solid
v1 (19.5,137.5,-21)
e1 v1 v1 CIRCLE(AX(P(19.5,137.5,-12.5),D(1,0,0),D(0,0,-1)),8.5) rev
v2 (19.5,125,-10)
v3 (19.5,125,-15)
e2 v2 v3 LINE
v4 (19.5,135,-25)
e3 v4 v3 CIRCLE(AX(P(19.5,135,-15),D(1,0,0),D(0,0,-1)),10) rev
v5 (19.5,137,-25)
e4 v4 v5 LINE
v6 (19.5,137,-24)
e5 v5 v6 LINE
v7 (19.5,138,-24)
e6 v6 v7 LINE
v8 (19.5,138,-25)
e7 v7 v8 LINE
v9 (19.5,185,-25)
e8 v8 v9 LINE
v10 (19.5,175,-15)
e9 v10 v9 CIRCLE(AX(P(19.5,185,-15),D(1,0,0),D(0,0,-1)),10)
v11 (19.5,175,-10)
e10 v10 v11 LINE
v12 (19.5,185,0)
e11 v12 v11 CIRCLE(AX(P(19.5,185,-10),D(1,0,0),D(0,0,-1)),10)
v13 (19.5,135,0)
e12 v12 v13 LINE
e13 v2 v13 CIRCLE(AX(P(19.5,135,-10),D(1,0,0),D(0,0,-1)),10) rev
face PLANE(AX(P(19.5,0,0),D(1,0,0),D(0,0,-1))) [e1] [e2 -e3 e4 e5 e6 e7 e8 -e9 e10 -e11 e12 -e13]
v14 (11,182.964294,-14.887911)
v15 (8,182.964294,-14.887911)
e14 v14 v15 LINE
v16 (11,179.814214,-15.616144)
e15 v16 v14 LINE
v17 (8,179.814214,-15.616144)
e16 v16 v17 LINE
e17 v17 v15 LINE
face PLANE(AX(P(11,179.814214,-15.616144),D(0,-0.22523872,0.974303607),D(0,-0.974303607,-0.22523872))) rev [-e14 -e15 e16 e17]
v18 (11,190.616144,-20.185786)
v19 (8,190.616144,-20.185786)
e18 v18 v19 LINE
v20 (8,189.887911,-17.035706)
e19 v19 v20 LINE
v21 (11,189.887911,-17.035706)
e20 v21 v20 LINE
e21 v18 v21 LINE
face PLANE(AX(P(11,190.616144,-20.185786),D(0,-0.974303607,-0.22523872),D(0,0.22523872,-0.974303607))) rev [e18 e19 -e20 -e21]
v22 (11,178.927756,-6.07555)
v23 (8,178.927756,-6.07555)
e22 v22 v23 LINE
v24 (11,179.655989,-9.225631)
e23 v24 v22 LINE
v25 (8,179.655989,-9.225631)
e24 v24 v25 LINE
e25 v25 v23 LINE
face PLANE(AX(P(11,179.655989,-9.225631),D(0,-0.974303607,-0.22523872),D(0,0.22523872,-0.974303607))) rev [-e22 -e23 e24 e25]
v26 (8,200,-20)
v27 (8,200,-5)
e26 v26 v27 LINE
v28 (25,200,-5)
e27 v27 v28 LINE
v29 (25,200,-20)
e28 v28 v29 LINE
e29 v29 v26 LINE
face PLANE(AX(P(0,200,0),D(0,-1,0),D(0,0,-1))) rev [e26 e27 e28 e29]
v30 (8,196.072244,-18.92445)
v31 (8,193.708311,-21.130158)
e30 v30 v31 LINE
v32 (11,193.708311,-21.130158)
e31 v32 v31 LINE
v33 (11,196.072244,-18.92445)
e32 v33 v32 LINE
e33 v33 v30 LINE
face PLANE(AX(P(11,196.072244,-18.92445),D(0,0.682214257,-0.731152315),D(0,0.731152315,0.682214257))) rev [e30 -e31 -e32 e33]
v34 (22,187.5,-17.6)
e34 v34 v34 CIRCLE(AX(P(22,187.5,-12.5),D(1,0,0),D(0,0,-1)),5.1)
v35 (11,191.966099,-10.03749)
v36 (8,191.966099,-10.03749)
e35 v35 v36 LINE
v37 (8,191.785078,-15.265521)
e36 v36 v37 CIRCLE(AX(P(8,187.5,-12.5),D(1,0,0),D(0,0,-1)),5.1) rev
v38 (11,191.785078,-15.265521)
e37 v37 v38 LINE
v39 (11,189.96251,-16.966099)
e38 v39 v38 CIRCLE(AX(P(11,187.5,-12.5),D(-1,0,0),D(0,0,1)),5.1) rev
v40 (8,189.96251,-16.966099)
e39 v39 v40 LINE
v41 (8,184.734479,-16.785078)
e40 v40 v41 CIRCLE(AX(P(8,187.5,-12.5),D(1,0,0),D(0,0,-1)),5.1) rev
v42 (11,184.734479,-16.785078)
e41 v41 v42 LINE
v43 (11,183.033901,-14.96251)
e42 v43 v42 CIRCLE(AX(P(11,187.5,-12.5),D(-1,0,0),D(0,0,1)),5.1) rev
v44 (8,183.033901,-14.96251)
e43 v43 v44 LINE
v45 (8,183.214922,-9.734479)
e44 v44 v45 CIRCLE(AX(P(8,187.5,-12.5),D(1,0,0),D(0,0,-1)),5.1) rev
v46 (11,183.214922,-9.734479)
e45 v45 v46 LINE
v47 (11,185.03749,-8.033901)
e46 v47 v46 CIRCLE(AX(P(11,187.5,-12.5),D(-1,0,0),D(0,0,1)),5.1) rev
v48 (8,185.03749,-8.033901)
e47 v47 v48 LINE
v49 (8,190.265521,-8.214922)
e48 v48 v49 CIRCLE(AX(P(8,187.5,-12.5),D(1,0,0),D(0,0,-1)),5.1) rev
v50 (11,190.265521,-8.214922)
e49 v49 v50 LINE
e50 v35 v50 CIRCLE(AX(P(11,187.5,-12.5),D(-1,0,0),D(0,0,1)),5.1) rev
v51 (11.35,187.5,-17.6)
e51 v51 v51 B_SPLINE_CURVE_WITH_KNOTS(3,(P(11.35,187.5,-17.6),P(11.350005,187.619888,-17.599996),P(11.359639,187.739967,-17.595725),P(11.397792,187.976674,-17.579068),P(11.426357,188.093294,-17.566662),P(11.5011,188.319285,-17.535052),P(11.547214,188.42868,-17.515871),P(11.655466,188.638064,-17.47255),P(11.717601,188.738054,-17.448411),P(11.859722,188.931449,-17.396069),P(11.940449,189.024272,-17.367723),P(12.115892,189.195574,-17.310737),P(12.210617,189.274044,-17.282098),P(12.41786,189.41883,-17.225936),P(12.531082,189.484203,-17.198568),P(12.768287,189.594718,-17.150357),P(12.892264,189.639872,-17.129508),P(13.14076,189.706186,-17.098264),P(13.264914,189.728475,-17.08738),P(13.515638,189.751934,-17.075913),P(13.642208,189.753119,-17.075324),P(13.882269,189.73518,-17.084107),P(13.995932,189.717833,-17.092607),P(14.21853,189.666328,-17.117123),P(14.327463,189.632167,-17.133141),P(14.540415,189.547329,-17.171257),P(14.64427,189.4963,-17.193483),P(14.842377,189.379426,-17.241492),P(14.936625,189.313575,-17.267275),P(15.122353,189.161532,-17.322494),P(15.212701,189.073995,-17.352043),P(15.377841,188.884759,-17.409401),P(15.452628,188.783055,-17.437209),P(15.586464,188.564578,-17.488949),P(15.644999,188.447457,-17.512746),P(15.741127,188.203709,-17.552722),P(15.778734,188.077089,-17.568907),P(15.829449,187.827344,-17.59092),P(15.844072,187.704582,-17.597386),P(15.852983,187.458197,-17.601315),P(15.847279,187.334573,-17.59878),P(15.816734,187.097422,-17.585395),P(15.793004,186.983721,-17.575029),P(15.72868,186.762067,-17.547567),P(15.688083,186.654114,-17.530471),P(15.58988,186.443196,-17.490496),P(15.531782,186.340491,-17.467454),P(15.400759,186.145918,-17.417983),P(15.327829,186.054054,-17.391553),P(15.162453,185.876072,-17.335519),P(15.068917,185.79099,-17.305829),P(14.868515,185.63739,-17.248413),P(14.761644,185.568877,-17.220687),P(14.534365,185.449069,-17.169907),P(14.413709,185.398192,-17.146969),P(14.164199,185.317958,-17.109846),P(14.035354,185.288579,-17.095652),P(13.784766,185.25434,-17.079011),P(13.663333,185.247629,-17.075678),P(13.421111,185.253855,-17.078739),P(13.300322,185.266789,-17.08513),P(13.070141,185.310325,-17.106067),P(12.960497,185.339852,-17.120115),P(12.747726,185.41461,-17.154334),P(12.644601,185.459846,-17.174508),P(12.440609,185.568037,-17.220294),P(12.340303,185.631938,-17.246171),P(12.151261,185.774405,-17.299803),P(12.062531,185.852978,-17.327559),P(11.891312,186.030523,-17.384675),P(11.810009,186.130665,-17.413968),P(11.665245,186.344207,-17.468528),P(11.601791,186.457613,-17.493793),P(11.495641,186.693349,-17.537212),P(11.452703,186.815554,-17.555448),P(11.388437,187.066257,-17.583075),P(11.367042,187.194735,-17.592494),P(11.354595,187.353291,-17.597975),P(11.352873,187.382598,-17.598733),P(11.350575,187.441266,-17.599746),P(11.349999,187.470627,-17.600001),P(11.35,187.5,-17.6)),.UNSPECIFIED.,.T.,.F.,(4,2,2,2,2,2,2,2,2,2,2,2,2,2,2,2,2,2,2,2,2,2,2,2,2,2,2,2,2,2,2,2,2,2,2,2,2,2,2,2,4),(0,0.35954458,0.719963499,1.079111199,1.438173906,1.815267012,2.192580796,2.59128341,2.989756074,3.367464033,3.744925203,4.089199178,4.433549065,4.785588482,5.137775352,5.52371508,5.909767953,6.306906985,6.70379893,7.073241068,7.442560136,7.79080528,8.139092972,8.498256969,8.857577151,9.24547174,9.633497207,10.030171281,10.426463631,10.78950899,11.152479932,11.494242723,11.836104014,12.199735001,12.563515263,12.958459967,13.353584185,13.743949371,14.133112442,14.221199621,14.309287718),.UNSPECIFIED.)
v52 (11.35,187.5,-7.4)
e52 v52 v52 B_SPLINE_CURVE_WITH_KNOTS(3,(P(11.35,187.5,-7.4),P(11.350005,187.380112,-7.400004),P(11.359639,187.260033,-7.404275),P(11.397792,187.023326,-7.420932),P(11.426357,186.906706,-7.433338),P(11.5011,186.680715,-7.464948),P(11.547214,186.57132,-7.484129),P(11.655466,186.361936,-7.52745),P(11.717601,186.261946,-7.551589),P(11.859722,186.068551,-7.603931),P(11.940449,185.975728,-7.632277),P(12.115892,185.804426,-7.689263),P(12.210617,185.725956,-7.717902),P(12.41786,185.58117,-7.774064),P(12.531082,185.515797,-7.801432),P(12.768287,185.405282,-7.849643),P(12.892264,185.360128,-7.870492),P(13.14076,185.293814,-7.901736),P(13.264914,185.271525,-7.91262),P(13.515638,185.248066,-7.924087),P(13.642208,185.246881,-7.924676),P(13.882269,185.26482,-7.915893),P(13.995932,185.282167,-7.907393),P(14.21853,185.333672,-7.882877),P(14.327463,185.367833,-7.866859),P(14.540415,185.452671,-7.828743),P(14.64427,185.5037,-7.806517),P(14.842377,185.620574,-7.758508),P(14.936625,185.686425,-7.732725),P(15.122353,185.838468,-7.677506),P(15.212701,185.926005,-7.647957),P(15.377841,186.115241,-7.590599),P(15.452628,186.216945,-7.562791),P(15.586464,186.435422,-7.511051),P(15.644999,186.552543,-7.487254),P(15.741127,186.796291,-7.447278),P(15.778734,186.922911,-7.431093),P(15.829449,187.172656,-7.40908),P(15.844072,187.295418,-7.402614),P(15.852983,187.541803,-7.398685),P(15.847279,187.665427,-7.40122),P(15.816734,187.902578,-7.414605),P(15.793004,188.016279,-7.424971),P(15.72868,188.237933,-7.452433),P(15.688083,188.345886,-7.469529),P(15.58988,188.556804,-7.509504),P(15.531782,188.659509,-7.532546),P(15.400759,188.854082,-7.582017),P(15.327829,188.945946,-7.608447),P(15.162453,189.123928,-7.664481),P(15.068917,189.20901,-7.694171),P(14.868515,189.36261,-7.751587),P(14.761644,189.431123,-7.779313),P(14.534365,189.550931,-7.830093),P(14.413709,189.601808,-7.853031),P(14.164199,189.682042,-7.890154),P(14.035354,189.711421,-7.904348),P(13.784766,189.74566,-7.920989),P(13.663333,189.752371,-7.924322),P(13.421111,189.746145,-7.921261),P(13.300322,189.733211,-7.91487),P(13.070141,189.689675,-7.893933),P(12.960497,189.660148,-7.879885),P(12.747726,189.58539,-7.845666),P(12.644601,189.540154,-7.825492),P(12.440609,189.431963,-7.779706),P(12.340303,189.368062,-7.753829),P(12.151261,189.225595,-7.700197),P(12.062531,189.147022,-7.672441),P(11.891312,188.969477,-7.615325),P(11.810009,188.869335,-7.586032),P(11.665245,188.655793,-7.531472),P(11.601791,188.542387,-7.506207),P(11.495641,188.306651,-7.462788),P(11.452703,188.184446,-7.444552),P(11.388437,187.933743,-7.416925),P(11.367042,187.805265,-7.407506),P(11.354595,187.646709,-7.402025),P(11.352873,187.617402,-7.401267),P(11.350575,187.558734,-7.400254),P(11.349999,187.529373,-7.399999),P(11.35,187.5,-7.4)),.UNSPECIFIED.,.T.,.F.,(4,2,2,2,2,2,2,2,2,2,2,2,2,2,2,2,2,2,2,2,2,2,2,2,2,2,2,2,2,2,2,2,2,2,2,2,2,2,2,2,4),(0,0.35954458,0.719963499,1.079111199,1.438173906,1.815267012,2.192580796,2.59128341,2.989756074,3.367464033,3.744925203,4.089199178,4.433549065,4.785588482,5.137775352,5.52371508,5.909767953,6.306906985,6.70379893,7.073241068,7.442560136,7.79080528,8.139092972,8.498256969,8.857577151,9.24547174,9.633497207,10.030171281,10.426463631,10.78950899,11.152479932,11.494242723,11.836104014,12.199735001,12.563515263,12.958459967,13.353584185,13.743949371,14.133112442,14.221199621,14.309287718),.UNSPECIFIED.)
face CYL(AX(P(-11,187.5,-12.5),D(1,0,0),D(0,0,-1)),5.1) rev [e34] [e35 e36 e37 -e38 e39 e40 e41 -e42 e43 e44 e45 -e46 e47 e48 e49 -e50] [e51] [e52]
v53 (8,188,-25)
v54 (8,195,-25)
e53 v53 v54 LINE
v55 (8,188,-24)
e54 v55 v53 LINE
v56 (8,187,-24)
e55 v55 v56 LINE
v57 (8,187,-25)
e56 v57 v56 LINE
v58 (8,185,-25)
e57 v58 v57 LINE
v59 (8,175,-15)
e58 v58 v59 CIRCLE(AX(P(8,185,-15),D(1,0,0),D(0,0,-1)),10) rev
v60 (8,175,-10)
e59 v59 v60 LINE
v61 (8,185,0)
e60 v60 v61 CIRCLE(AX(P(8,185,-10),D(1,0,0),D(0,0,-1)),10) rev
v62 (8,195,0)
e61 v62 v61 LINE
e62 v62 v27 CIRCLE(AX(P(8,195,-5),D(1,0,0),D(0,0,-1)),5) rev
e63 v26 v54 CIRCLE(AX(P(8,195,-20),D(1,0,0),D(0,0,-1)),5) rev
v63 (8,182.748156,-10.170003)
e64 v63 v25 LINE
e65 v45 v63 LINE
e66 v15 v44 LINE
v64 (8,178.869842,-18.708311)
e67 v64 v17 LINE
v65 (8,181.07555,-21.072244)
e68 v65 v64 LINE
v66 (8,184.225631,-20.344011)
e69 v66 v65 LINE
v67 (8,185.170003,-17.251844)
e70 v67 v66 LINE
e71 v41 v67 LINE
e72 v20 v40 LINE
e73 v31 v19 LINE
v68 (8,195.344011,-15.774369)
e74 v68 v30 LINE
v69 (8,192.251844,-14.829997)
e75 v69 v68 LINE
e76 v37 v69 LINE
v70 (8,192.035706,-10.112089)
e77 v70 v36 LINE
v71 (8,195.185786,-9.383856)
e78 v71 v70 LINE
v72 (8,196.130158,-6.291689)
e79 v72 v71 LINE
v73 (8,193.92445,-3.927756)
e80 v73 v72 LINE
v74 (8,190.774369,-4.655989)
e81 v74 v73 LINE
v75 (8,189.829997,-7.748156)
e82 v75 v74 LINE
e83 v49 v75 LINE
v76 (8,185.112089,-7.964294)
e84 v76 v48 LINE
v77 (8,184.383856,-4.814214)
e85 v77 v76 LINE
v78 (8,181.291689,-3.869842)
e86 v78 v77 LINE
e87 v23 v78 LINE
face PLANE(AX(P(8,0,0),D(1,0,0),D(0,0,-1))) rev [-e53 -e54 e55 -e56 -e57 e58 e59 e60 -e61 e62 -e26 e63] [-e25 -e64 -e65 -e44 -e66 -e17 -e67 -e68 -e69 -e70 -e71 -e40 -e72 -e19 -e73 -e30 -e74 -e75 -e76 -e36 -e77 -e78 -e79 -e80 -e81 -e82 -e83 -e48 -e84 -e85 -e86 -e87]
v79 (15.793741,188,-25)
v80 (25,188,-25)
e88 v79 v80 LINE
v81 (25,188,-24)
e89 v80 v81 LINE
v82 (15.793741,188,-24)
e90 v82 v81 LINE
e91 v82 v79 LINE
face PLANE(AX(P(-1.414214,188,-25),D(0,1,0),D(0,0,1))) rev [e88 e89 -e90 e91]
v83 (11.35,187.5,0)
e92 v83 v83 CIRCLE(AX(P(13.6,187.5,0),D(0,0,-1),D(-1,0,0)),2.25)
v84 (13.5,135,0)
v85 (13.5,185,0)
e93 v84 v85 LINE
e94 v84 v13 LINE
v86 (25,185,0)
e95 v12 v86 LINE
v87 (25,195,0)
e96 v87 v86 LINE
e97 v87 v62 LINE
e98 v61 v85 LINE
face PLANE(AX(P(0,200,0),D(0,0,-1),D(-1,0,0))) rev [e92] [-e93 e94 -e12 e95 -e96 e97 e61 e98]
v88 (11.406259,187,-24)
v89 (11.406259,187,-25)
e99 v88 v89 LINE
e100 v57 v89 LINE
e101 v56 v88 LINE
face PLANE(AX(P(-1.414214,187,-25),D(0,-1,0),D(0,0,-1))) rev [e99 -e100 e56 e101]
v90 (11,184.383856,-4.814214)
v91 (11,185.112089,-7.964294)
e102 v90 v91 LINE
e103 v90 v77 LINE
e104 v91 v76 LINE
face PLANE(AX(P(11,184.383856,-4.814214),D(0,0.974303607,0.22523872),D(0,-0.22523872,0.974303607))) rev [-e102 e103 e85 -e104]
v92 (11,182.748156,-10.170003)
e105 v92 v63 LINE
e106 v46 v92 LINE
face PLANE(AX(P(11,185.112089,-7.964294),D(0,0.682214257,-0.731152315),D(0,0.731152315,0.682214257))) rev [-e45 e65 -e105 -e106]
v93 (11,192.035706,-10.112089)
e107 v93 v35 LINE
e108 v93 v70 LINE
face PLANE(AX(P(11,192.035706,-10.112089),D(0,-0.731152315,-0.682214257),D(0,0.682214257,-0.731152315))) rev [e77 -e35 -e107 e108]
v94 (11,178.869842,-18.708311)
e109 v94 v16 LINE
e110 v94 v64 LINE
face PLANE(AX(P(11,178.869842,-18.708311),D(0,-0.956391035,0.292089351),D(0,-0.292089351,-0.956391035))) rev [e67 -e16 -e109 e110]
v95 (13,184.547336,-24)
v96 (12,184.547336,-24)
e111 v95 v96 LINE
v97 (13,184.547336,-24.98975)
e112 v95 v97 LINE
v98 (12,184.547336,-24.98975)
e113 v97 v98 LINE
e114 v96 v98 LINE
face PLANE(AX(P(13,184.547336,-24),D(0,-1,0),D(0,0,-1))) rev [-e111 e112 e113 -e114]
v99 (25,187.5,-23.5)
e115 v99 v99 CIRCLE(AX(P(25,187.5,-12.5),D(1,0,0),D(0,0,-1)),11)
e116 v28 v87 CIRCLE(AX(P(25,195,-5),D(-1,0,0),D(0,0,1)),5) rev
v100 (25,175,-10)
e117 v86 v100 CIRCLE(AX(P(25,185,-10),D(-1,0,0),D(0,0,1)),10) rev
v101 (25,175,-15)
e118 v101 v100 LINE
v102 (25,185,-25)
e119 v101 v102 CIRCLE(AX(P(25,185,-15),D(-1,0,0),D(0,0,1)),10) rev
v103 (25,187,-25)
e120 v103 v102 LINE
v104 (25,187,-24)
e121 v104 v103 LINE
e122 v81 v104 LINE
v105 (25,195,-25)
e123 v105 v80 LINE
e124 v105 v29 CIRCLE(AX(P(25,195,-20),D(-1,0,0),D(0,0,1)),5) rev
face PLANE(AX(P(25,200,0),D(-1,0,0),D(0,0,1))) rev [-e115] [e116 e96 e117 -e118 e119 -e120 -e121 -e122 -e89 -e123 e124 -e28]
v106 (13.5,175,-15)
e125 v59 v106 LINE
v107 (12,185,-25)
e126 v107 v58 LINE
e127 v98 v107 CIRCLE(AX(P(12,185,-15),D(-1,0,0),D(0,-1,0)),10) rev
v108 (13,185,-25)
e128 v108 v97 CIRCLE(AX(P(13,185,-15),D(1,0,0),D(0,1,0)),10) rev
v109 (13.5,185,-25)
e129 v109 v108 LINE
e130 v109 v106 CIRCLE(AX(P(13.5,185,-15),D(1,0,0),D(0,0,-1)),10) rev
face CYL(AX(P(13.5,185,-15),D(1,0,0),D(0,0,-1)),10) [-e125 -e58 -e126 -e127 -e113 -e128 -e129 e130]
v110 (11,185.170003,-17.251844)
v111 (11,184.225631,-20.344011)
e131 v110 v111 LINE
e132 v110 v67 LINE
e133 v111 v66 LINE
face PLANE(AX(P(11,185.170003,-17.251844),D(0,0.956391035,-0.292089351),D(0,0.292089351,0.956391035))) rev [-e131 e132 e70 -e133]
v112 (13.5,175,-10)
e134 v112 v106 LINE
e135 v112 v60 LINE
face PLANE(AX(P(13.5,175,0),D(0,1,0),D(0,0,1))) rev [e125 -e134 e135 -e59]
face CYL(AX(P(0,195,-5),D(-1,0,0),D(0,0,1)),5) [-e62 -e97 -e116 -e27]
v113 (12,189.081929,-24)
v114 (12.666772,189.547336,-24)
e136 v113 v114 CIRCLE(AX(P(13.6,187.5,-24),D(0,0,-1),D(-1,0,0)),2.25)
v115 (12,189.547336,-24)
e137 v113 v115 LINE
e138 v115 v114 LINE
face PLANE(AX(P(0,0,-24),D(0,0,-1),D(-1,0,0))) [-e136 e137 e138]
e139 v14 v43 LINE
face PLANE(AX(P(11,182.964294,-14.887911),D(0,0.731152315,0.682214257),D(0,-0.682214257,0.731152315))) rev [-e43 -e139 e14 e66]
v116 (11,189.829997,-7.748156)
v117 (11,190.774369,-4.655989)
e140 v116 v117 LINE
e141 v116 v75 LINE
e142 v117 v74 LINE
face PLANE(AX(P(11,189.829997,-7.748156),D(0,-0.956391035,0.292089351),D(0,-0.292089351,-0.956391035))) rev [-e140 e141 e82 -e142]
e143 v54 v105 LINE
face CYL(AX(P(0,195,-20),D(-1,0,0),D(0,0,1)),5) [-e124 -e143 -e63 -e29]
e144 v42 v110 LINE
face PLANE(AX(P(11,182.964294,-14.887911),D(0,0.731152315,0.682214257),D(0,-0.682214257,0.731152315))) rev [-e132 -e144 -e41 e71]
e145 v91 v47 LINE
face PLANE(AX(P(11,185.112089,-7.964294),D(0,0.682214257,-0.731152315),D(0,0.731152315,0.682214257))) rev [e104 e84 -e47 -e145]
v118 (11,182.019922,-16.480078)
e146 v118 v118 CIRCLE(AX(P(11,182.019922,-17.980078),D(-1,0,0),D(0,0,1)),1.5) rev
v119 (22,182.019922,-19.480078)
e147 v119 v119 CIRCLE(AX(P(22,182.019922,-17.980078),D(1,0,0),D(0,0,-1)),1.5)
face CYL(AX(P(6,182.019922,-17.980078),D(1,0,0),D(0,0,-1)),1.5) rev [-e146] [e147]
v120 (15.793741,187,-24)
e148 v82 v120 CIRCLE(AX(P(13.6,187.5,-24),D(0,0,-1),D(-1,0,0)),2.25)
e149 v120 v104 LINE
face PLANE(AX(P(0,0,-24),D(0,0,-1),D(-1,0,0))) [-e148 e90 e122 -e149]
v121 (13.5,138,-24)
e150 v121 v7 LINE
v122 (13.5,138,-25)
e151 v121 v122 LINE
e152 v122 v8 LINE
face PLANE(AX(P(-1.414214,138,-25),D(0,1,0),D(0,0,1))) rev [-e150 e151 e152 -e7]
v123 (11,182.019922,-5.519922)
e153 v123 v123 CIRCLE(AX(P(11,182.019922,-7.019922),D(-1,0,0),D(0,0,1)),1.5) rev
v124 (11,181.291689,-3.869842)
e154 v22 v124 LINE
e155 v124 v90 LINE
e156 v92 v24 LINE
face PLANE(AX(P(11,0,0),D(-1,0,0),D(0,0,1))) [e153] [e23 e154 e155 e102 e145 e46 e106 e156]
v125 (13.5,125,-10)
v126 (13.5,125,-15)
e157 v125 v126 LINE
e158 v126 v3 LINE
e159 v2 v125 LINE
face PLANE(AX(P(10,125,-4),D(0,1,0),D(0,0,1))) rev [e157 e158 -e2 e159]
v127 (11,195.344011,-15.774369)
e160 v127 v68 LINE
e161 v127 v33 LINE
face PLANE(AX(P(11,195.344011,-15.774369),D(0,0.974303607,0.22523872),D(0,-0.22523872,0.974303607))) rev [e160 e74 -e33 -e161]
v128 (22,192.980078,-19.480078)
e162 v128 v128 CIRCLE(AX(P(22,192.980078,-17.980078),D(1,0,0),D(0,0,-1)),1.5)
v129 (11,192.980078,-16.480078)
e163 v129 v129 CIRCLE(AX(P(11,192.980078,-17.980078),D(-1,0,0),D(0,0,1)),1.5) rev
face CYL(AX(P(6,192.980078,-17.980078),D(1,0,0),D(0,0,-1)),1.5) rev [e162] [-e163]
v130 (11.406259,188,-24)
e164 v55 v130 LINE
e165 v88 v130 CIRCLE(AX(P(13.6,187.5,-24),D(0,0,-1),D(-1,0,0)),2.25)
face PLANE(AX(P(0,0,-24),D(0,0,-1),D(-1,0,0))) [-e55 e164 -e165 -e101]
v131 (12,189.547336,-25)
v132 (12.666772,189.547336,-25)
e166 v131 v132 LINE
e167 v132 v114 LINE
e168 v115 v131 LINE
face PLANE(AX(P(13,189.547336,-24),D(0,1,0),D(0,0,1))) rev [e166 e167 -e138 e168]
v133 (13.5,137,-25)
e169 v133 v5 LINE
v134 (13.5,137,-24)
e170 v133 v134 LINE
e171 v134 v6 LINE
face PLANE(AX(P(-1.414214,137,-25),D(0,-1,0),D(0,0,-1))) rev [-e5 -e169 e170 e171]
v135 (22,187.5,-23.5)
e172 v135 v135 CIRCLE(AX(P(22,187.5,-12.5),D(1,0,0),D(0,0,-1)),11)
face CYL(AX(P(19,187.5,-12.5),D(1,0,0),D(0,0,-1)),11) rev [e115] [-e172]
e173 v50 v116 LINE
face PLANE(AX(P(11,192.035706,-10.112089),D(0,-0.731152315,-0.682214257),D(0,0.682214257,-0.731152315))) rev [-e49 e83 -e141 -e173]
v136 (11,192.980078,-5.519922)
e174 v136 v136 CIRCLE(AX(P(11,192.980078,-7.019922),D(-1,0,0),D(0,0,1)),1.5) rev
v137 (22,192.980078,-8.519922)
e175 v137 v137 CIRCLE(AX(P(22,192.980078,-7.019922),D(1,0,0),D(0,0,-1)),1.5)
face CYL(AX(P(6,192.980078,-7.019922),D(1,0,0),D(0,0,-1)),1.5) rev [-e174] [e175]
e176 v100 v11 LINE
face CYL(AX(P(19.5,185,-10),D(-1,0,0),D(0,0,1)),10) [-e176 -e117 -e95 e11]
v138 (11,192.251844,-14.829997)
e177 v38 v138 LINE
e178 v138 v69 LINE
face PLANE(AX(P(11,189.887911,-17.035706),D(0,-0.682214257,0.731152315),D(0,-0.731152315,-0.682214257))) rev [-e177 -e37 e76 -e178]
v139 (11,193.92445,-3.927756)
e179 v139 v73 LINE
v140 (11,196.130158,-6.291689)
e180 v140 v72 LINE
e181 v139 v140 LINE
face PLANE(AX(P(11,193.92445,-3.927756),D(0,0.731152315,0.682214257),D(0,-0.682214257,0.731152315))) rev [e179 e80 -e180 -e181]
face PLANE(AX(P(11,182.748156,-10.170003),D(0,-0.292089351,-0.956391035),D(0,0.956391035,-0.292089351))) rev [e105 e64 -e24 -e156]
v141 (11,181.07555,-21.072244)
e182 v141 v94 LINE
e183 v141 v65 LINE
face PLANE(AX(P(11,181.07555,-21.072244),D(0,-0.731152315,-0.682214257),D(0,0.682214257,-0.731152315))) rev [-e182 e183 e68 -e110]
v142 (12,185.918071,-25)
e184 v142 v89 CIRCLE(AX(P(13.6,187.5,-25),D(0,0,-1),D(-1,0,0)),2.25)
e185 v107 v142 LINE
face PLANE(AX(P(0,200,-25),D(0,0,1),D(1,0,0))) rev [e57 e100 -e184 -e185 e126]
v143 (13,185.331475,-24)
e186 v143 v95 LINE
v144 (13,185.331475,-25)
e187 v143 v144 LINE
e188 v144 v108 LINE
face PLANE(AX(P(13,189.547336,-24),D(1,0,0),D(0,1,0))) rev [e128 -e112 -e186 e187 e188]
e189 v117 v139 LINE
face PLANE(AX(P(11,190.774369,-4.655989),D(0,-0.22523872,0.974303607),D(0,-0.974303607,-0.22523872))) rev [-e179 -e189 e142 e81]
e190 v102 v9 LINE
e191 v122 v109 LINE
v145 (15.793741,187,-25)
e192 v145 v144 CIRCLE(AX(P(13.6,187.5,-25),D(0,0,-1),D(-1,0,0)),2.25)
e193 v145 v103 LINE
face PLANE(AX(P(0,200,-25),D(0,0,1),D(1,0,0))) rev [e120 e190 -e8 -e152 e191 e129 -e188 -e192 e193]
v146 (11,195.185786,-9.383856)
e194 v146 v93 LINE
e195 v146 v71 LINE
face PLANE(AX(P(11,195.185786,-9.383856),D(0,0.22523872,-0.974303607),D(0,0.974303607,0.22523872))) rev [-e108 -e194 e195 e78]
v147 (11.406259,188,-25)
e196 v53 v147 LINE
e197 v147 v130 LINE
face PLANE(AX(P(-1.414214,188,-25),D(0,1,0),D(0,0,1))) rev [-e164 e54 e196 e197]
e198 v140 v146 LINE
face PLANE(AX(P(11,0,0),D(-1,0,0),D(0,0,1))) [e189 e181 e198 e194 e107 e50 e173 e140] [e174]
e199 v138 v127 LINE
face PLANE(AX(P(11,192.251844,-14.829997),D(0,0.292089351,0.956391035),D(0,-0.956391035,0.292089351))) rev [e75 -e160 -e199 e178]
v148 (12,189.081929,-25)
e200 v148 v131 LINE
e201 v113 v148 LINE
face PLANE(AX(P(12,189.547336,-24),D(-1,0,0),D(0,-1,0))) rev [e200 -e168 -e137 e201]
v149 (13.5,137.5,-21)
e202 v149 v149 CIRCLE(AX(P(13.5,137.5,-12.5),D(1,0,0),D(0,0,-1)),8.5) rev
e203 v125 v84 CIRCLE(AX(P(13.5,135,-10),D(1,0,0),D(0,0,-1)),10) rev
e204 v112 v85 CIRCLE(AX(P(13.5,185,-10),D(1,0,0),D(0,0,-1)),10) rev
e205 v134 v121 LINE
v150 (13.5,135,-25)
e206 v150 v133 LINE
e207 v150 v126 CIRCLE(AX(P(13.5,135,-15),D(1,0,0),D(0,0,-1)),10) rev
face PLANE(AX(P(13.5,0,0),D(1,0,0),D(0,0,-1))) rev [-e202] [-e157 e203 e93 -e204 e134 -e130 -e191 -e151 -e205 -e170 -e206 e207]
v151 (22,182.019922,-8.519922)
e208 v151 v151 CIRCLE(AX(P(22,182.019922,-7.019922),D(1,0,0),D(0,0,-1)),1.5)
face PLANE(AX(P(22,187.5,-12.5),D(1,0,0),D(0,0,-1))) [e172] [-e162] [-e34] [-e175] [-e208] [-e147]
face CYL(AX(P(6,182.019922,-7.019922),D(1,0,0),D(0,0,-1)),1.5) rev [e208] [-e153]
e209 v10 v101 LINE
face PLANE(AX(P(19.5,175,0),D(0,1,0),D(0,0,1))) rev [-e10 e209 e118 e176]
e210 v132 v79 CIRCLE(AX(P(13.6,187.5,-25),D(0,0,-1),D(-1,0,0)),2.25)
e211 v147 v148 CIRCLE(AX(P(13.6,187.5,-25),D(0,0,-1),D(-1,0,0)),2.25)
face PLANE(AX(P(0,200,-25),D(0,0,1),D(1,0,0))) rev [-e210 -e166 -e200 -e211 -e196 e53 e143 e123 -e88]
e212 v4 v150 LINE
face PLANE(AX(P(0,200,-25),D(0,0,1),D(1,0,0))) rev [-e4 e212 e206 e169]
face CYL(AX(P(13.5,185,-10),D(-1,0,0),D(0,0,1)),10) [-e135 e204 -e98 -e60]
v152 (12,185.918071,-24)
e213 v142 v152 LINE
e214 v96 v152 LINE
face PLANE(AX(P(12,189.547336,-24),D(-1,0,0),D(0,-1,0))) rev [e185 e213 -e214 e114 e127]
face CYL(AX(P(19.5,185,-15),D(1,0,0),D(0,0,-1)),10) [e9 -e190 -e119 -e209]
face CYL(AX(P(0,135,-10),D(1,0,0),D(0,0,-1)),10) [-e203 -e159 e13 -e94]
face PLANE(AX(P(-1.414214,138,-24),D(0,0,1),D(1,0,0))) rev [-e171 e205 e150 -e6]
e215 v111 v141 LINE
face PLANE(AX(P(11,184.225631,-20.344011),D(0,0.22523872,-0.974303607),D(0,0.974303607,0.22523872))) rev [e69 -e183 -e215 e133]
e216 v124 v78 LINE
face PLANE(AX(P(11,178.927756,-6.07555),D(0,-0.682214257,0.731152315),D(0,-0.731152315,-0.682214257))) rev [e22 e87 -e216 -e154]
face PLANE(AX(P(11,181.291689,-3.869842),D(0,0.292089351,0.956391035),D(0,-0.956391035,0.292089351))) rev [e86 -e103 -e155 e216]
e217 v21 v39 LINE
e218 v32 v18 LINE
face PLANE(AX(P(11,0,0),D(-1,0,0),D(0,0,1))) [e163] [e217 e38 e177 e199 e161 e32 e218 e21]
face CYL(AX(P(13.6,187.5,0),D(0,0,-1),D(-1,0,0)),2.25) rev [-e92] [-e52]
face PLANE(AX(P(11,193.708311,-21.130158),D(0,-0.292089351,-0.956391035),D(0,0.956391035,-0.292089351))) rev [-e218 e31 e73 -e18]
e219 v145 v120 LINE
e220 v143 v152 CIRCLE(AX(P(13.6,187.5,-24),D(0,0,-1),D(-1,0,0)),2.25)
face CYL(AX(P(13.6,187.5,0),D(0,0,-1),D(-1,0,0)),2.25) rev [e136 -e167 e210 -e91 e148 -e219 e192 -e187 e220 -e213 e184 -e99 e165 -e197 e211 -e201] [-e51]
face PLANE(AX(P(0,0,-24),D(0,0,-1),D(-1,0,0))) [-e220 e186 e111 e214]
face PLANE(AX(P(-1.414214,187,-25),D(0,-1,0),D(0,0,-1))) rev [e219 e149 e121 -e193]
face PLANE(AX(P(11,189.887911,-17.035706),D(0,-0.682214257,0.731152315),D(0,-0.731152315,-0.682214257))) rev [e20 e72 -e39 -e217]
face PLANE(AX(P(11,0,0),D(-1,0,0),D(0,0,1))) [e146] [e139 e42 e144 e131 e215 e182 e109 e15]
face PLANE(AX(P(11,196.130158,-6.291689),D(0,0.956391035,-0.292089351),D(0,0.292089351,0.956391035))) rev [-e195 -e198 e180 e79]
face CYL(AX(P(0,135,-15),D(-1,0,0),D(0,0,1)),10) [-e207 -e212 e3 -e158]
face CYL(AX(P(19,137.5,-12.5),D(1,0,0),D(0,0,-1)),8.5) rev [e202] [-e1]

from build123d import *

# Parameters (mm, degrees)
CROQUIS1_W              = 25
CROQUIS1_H              = 25
SALIENTE_EXTRUIR1_DEPTH = 200
REDONDEO1_R             = 10
REDONDEO2_R             = 10
REDONDEO3_R             = 5
REDONDEO4_R             = 5
CROQUIS2_R              = 11
CROQUIS2_R_2            = 8.5
CORTAR_EXTRUIR1_DEPTH   = 6
CROQUIS3_R              = 8.5
CORTAR_EXTRUIR2_DEPTH   = 6
CROQUIS9_R              = 5.1
CROQUIS9_R_2            = 6
CORTAR_EXTRUIR6_DEPTH   = 30
CROQUIS13_W             = 1
CROQUIS13_H             = 5
CORTAR_EXTRUIR8_DEPTH   = 1
SALIENTE_EXTRUIR3_START = 3
CROQUIS14_R             = 11
CROQUIS14_R_2           = 5.1
SALIENTE_EXTRUIR3_DEPTH = 3
CROQUIS15_R             = 1.5
CORTAR_EXTRUIR9_DEPTH   = 16
CORTAR_EXTRUIR10_DEPTH  = 11
CORTAR_EXTRUIR12_REACH  = 205.101
CROQUIS18_W             = 1
CROQUIS18_H             = 1
CROQUIS20_W             = 17
CROQUIS20_H             = 100
CORTAR_EXTRUIR14_DEPTH  = 10
CROQUIS12_R             = 2.25
CORTAR_EXTRUIR7_DEPTH   = 204.100960116
CROQUIS21_W             = 58.914779702
CROQUIS21_H             = 35.760408196
CORTAR_EXTRUIR15_DEPTH  = 125
CROQUIS22_W             = 33.286593493
CROQUIS22_H             = 72.977677401
CORTAR_EXTRUIR16_DEPTH  = 8
REDONDEO5_R             = 10
CROQUIS24_R             = 8.5
CORTAR_EXTRUIR18_DEPTH  = 27
CROQUIS25_W             = 26.132042823
CROQUIS25_H             = 80
CORTAR_EXTRUIR19_DEPTH  = 5.5
REDONDEO6_R             = 10
REDONDEO7_R             = 10
CROQUIS27_W             = 27.934503923
CROQUIS27_H             = 80
CORTAR_EXTRUIR21_DEPTH  = 13.5
REDONDEO8_R             = 10
REDONDEO9_R             = 10


with BuildPart() as part:
    # Croquis1 → Saliente-Extruir1 (new body)
    with BuildSketch(Plane(origin=(0, 0, 0), x_dir=(1, 0, 0), z_dir=(0, 1, 0))):
        with Locations((12.5, 12.5)):
            Rectangle(CROQUIS1_W, CROQUIS1_H)
    extrude(amount=SALIENTE_EXTRUIR1_DEPTH)

    # Redondeo1
    redondeo1_edges = [part.edges().sort_by_distance(p)[0] for p in [
        (12.5, 0, -25),
    ]]
    fillet(redondeo1_edges, radius=REDONDEO1_R)

    # Redondeo2
    redondeo2_edges = [part.edges().sort_by_distance(p)[0] for p in [
        (12.5, 0, 0),
    ]]
    fillet(redondeo2_edges, radius=REDONDEO2_R)

    # Redondeo3
    redondeo3_edges = [part.edges().sort_by_distance(p)[0] for p in [
        (12.5, 200, 0),
    ]]
    fillet(redondeo3_edges, radius=REDONDEO3_R)

    # Redondeo4
    redondeo4_edges = [part.edges().sort_by_distance(p)[0] for p in [
        (12.5, 200, -25),
    ]]
    fillet(redondeo4_edges, radius=REDONDEO4_R)

    # Croquis2 → Cortar-Extruir1 (cut)
    with BuildSketch(Plane(origin=(25, 0, 0), x_dir=(0, 0, -1), z_dir=(1, 0, 0))):
        with Locations((12.5, 187.5)):
            Circle(CROQUIS2_R)
        with Locations(Location((12.5, 137.5, 0), (0, 0, 180))):
            Circle(CROQUIS2_R_2)
    extrude(amount=-CORTAR_EXTRUIR1_DEPTH, mode=Mode.SUBTRACT)

    # Croquis3 → Cortar-Extruir2 (cut)
    with BuildSketch(Plane.ZY):
        with Locations((-12.5, 12.5)):
            Circle(CROQUIS3_R)
        with Locations(Location((-12.5, 187.5, 0), (0, 0, 180))):
            Circle(CROQUIS3_R)
    extrude(amount=-CORTAR_EXTRUIR2_DEPTH, mode=Mode.SUBTRACT)

    # Croquis9 → Cortar-Extruir6 (cut)
    with BuildSketch(Plane(origin=(19, 0, 0), x_dir=(0, 0, -1), z_dir=(1, 0, 0))):
        with Locations((12.5, 187.5)):
            Circle(CROQUIS9_R)
        with Locations((12.5, 137.5)):
            Circle(CROQUIS9_R_2)
    extrude(amount=-CORTAR_EXTRUIR6_DEPTH, mode=Mode.SUBTRACT)

    # Croquis13 → Cortar-Extruir8 (cut)
    with BuildSketch(Plane(origin=(0, 0, -25), x_dir=(-1, 0, 0), z_dir=(0, 0, -1))):
        with Locations((-12.5, 187.04733642)):
            Rectangle(CROQUIS13_W, CROQUIS13_H)
    extrude(amount=-CORTAR_EXTRUIR8_DEPTH, mode=Mode.SUBTRACT)

    # Croquis14 → Saliente-Extruir3 (add)
    with BuildSketch(Plane(origin=(19, 0, 0), x_dir=(0, 0, -1), z_dir=(1, 0, 0)).offset(SALIENTE_EXTRUIR3_START)):
        with Locations((12.5, 187.5)):
            Circle(CROQUIS14_R)
        with Locations((12.5, 187.5)):
            Circle(CROQUIS14_R_2, mode=Mode.SUBTRACT)
    extrude(amount=-SALIENTE_EXTRUIR3_DEPTH)

    # Croquis15 → Cortar-Extruir9 (cut)
    with BuildSketch(Plane(origin=(22, 0, 0), x_dir=(0, 0, -1), z_dir=(1, 0, 0))):
        with Locations((17.980077554, 182.019922446)):
            Circle(CROQUIS15_R)
        with Locations((7.019922446, 182.019922446)):
            Circle(CROQUIS15_R)
        with Locations((7.019922446, 192.980077554)):
            Circle(CROQUIS15_R)
        with Locations((17.980077554, 192.980077554)):
            Circle(CROQUIS15_R)
    extrude(amount=-CORTAR_EXTRUIR9_DEPTH, mode=Mode.SUBTRACT)

    # Croquis16 → Cortar-Extruir10 (cut)
    with BuildSketch(Plane.ZY):
        Polygon((-14.829996635, 192.251844396), (-15.774368679, 195.344011075), (-18.924449599, 196.072244234), (-21.130158474, 193.708310713), (-20.185786429, 190.616144033), (-17.035705509, 189.887910875), align=None)
        Polygon((-17.251844396, 185.170003365), (-20.344011075, 184.225631321), (-21.072244234, 181.075550401), (-18.708310713, 178.869841526), (-15.616144033, 179.814213571), (-14.887910875, 182.964294491), align=None)
        Polygon((-7.748155604, 189.829996635), (-4.655988925, 190.774368679), (-3.927755766, 193.924449599), (-6.291689287, 196.130158474), (-9.383855967, 195.185786429), (-10.112089125, 192.035705509), align=None)
        Polygon((-10.170003365, 182.748155604), (-9.225631321, 179.655988925), (-6.075550401, 178.927755766), (-3.869841526, 181.291689287), (-4.814213571, 184.383855967), (-7.964294491, 185.112089125), align=None)
    extrude(amount=-CORTAR_EXTRUIR10_DEPTH, mode=Mode.SUBTRACT)

    # Cortar-Extruir12: up to this face of the body (flat: up to its plane)
    cortar_extruir12_end = Plane(part.part.faces().sort_by_distance((0, 98.930151157, -12.5))[0])
    # Croquis18 → Cortar-Extruir12 (cut, up to the picked face)
    with BuildSketch(Plane(origin=(25, 0, 0), x_dir=(0, 0, -1), z_dir=(1, 0, 0)), mode=Mode.PRIVATE) as cortar_extruir12_sk1:
        with Locations((24.5, 187.5)):
            Rectangle(CROQUIS18_W, CROQUIS18_H)
    cortar_extruir12_tool1 = split(extrude(cortar_extruir12_sk1.sketch, amount=-CORTAR_EXTRUIR12_REACH, mode=Mode.PRIVATE), bisect_by=cortar_extruir12_end, keep=Keep.BOTH, mode=Mode.PRIVATE)
    # Croquis18 → Cortar-Extruir12 (cut, up to the picked face)
    with BuildSketch(Plane(origin=(25, 0, 0), x_dir=(0, 0, -1), z_dir=(1, 0, 0)), mode=Mode.PRIVATE) as cortar_extruir12_sk2:
        with Locations((24.5, 137.5)):
            Rectangle(CROQUIS18_W, CROQUIS18_H)
    cortar_extruir12_tool2 = split(extrude(cortar_extruir12_sk2.sketch, amount=-CORTAR_EXTRUIR12_REACH, mode=Mode.PRIVATE), bisect_by=cortar_extruir12_end, keep=Keep.BOTH, mode=Mode.PRIVATE)
    add(cortar_extruir12_tool1.solids().sort_by(Axis((25, 187.5, -24.5), (-1, 0, 0)))[0], mode=Mode.SUBTRACT)
    add(cortar_extruir12_tool2.solids().sort_by(Axis((25, 137.5, -24.5), (-1, 0, 0)))[0], mode=Mode.SUBTRACT)

    # Croquis20 → Cortar-Extruir14 (cut)
    with BuildSketch(Plane.ZY):
        with Locations((-12.5, 75)):
            Rectangle(CROQUIS20_W, CROQUIS20_H)
    extrude(amount=-CORTAR_EXTRUIR14_DEPTH, mode=Mode.SUBTRACT)

    # Croquis12 → Cortar-Extruir7 (cut, through all)
    with BuildSketch(Plane(origin=(0, 0, -25), x_dir=(-1, 0, 0), z_dir=(0, 0, -1))):
        with Locations((-13.6, 187.5)):
            Circle(CROQUIS12_R)
    extrude(amount=-CORTAR_EXTRUIR7_DEPTH, mode=Mode.SUBTRACT)

    # Croquis21 → Cortar-Extruir15 (cut)
    with BuildSketch(Plane.XZ):
        with Locations((8.512503063, -10.548361389)):
            Rectangle(CROQUIS21_W, CROQUIS21_H)
    extrude(amount=-CORTAR_EXTRUIR15_DEPTH, mode=Mode.SUBTRACT)

    # Croquis22 → Cortar-Extruir16 (cut)
    with BuildSketch(Plane.ZY):
        with Locations((-13.640786543, 171.307251967)):
            Rectangle(CROQUIS22_W, CROQUIS22_H)
    extrude(amount=-CORTAR_EXTRUIR16_DEPTH, mode=Mode.SUBTRACT)

    # Redondeo5
    redondeo5_edges = [part.edges().sort_by_distance(p)[0] for p in [
        (12.5, 125, -25),
        (12.5, 125, 0),
    ]]
    fillet(redondeo5_edges, radius=REDONDEO5_R)

    # Croquis24 → Cortar-Extruir18 (cut)
    with BuildSketch(Plane(origin=(19, 0, 0), x_dir=(0, 0, -1), z_dir=(1, 0, 0))):
        with Locations(Location((12.5, 137.5, 0), (0, 0, 341.610158782))):
            Circle(CROQUIS24_R)
    extrude(amount=-CORTAR_EXTRUIR18_DEPTH, mode=Mode.SUBTRACT)

    # Croquis25 → Cortar-Extruir19 (cut)
    with BuildSketch(Plane(origin=(25, 0, 0), x_dir=(0, 0, -1), z_dir=(1, 0, 0))):
        with Locations((13.066021412, 135)):
            Rectangle(CROQUIS25_W, CROQUIS25_H)
    extrude(amount=-CORTAR_EXTRUIR19_DEPTH, mode=Mode.SUBTRACT)

    # Redondeo6
    redondeo6_edges = [part.edges().sort_by_distance(p)[0] for p in [
        (22.25, 175, -25),
    ]]
    fillet(redondeo6_edges, radius=REDONDEO6_R)

    # Redondeo7
    redondeo7_edges = [part.edges().sort_by_distance(p)[0] for p in [
        (22.25, 175, 0),
    ]]
    fillet(redondeo7_edges, radius=REDONDEO7_R)

    # Croquis27 → Cortar-Extruir21 (cut)
    with BuildSketch(Plane.ZY):
        with Locations((-13.967251962, 135)):
            Rectangle(CROQUIS27_W, CROQUIS27_H)
    extrude(amount=-CORTAR_EXTRUIR21_DEPTH, mode=Mode.SUBTRACT)

    # Redondeo8
    # the kernel refuses this fillet: 10 mm, written as the material it takes off along each edge
    with BuildSketch(Plane(origin=(38.5, 175, -25), x_dir=(0, 0, 1), z_dir=(-1, 0, 0))) as redondeo8_piece_1_section:
        with BuildLine():
            CenterArc((REDONDEO8_R, REDONDEO8_R), REDONDEO8_R, 180, 90)
            Line((0, REDONDEO8_R), (0, 0))
            Line((0, 0), (REDONDEO8_R, 0))
        make_face()
    redondeo8_piece_1 = extrude(amount=55.5, mode=Mode.PRIVATE)
    redondeo8_piece_1 = split(redondeo8_piece_1, bisect_by=Plane(origin=(19.5, 177.263951143, -22.736048857), z_dir=(1, 0, 0)), keep=Keep.TOP, mode=Mode.PRIVATE)
    add(redondeo8_piece_1, mode=Mode.SUBTRACT)
    with BuildSketch(Plane(origin=(13.5, 175, -25), x_dir=(0, 0, 1), z_dir=(-1, 0, 0))) as redondeo8_piece_2:
        with BuildLine():
            CenterArc((REDONDEO8_R, REDONDEO8_R), REDONDEO8_R, 180, 90)
            Line((0, REDONDEO8_R), (0, 0))
            Line((0, 0), (REDONDEO8_R, 0))
        make_face()
    extrude(amount=30.5, mode=Mode.SUBTRACT)

    # Redondeo9
    redondeo9_edges = [part.edges().sort_by_distance(p)[0] for p in [
        (10.75, 175, 0),
    ]]
    fillet(redondeo9_edges, radius=REDONDEO9_R)


solid = part.part
